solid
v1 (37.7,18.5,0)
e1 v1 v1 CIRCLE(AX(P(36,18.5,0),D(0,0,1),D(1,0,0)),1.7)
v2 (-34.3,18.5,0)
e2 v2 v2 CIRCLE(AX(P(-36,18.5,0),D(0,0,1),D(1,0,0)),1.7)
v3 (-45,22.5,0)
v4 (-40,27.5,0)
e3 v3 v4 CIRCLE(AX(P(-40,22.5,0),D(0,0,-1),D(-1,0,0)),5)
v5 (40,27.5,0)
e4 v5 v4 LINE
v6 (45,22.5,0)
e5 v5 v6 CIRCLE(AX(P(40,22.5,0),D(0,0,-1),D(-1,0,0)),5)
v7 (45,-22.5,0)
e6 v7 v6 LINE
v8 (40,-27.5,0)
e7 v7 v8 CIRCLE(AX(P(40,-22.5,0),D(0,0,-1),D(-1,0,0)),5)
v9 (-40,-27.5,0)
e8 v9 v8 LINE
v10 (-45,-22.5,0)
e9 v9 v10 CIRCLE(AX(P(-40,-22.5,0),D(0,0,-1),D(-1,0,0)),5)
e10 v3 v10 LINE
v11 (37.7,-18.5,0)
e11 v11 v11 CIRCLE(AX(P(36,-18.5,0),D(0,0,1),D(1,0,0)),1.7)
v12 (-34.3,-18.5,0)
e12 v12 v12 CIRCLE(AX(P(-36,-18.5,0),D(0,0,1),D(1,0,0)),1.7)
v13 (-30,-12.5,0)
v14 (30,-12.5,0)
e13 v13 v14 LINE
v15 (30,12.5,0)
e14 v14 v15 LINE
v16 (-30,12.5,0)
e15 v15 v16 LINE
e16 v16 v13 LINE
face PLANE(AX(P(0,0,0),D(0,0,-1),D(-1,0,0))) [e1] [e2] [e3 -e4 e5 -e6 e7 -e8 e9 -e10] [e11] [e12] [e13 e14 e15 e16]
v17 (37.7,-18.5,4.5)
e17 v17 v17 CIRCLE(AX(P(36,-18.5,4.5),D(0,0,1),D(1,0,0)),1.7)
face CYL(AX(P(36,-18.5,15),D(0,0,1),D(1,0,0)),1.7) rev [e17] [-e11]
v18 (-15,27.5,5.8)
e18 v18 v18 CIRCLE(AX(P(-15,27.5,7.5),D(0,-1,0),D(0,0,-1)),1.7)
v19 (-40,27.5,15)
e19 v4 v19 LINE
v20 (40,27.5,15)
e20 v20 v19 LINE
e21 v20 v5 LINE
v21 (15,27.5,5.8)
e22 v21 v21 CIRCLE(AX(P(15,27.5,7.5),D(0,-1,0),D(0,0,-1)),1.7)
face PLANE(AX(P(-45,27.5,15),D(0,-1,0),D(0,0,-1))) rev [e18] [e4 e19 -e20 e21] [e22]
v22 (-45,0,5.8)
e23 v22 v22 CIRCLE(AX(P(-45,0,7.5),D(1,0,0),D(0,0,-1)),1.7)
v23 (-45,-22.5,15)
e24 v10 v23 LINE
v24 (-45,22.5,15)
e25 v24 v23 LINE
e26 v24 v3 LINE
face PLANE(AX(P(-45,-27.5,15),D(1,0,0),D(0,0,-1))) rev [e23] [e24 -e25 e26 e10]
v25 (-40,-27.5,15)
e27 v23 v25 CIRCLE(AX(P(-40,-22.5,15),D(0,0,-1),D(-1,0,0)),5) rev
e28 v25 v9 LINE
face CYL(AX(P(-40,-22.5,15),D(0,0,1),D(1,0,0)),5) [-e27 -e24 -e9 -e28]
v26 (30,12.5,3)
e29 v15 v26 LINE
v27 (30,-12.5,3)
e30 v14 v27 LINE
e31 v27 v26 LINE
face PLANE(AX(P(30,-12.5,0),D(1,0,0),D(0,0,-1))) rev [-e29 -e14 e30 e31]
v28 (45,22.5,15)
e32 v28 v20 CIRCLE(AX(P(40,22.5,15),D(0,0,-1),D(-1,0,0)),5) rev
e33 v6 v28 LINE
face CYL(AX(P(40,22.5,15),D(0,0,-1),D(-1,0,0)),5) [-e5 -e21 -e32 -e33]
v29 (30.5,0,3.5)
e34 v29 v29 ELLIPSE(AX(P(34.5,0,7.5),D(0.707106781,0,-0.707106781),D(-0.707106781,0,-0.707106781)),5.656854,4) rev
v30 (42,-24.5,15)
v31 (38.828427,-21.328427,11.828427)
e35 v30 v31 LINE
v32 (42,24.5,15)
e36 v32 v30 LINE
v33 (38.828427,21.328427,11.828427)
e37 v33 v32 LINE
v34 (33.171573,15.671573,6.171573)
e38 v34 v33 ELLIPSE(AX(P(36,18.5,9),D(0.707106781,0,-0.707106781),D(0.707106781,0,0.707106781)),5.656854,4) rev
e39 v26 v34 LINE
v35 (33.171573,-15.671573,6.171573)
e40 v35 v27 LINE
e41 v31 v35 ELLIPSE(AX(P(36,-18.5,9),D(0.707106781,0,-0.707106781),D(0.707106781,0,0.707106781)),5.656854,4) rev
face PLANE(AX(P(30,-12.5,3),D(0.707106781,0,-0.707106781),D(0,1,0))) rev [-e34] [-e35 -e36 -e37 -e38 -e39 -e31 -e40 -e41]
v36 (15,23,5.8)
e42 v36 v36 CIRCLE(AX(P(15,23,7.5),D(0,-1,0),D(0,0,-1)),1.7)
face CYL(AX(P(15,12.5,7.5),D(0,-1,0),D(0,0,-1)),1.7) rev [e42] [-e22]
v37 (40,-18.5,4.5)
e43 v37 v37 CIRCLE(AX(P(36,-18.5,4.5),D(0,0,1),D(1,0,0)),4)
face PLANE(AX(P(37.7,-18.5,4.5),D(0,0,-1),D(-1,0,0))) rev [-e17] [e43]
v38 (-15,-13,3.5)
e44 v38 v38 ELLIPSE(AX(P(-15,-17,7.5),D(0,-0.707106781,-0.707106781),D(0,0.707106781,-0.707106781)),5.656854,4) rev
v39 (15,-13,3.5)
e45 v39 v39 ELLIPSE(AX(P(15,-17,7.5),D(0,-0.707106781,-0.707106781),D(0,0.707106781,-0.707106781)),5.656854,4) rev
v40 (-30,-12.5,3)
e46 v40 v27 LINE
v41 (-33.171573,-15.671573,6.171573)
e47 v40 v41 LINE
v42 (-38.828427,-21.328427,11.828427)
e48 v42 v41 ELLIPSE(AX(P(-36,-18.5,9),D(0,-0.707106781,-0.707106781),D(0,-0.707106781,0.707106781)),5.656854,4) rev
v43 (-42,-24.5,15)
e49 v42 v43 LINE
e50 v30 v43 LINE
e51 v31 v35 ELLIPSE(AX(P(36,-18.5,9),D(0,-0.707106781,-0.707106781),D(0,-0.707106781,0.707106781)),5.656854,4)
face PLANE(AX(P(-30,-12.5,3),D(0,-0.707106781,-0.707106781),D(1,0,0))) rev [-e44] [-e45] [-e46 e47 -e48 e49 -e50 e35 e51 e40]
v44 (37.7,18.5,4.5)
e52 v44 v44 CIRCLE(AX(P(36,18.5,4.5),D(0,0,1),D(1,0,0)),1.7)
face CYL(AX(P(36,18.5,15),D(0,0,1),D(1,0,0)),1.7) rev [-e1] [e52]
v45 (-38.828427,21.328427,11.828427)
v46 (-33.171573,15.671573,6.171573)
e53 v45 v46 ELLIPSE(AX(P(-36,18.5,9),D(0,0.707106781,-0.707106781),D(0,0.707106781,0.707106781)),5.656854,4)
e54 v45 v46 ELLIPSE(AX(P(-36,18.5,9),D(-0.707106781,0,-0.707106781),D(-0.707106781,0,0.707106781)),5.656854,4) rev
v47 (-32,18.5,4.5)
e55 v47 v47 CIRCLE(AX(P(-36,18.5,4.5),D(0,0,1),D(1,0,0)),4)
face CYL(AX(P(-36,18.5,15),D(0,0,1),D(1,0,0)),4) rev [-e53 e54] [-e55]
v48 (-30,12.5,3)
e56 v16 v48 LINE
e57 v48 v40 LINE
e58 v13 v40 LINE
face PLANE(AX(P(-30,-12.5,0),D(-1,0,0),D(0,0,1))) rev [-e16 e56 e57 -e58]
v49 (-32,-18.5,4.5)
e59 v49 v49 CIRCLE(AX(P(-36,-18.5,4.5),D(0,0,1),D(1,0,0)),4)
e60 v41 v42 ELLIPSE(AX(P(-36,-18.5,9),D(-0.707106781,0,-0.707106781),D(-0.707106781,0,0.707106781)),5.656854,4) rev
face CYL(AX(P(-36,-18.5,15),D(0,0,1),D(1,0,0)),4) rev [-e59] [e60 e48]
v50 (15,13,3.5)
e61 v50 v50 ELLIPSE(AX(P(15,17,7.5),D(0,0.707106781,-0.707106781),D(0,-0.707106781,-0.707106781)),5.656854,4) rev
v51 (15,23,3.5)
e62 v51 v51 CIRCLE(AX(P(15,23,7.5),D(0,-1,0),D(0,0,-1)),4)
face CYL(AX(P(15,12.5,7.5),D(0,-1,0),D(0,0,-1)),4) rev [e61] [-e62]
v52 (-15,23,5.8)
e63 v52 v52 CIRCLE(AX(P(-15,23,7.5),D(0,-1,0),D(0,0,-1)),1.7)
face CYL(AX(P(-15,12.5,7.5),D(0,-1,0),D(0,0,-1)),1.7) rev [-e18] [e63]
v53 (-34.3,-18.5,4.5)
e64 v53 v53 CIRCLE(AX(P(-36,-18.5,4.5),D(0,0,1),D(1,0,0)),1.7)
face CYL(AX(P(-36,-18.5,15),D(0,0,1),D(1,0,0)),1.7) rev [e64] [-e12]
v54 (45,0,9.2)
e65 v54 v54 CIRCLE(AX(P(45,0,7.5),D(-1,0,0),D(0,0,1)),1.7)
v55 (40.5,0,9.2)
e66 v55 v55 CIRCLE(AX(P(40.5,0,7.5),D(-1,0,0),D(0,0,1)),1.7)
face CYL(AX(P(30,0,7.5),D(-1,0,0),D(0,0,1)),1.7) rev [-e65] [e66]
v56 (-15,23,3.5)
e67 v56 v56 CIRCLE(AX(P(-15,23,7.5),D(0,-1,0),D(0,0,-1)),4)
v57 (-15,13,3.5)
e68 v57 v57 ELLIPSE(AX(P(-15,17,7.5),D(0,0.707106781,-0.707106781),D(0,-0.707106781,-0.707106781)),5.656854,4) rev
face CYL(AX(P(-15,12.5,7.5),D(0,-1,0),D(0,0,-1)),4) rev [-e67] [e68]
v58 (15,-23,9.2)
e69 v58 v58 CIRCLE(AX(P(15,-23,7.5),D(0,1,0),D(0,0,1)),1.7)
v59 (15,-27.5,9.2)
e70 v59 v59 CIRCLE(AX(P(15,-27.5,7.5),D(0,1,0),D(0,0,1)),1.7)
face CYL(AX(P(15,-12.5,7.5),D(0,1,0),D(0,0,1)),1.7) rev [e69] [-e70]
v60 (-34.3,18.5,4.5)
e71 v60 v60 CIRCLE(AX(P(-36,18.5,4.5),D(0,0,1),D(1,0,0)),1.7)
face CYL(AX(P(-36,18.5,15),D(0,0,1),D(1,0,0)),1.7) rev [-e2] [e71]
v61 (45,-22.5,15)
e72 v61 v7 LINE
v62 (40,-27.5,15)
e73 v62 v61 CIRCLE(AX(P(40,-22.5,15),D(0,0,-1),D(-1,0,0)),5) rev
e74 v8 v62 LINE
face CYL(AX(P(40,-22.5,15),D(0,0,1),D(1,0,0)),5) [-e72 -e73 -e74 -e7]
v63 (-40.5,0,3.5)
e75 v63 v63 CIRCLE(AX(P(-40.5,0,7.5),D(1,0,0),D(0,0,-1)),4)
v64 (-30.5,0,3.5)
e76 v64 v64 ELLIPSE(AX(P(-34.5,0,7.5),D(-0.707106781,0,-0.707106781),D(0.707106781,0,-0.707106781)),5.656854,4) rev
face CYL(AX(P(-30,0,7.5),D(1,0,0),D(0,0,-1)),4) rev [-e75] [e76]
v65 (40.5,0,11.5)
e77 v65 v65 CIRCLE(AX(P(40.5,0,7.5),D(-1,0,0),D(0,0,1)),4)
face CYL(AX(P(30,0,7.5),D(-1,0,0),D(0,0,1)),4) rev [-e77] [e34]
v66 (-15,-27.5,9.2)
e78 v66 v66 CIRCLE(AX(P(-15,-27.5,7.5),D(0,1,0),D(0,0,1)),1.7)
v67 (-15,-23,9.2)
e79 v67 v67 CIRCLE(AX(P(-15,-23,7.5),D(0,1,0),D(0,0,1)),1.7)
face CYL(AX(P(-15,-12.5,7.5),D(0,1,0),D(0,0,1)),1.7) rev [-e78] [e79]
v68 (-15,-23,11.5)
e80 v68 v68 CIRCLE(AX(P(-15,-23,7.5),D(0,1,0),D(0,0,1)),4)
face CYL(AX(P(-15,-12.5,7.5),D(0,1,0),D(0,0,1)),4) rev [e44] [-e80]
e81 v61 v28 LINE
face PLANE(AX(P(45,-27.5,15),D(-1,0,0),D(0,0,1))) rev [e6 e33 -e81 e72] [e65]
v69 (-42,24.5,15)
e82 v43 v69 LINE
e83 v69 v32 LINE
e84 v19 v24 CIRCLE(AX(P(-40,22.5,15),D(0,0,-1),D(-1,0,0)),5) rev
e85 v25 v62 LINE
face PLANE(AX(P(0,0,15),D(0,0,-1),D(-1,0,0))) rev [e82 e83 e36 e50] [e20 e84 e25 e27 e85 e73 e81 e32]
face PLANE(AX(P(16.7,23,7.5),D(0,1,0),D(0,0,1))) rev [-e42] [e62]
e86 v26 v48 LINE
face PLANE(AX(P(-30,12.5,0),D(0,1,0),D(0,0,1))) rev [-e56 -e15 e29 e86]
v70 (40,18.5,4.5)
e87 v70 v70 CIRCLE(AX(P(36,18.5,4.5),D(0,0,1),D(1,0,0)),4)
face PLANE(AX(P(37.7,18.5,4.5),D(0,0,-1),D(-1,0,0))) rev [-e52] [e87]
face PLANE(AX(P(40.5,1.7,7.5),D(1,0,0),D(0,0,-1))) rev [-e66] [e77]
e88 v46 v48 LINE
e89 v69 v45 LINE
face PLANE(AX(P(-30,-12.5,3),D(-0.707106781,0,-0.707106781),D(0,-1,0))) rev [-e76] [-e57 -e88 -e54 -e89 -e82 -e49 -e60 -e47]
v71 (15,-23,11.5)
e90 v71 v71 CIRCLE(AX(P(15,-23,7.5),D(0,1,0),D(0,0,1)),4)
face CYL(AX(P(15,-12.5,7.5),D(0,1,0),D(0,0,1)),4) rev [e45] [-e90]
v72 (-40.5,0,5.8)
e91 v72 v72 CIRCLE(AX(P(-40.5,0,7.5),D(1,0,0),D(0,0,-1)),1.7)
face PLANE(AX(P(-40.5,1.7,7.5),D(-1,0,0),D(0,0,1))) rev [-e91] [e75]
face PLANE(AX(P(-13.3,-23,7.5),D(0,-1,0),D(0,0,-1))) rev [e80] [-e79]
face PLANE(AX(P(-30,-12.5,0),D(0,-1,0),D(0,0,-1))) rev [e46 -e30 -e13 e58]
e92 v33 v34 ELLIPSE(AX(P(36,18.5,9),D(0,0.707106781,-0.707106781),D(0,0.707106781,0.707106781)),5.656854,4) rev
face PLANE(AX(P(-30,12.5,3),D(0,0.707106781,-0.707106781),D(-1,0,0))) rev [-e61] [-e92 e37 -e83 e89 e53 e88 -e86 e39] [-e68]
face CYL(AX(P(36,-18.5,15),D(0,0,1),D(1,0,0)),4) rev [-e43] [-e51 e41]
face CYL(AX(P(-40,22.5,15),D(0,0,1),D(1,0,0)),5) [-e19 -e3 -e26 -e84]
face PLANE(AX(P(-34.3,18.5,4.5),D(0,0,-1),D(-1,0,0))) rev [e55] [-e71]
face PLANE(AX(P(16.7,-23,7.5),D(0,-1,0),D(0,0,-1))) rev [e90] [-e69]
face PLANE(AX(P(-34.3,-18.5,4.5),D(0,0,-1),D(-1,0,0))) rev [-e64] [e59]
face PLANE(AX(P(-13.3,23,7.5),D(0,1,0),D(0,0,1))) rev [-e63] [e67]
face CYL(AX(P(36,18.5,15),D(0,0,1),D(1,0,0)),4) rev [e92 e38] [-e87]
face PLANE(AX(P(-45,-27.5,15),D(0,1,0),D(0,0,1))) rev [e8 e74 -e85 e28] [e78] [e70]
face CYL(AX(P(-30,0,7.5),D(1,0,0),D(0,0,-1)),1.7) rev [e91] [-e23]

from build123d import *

# Parameters (mm, degrees)
SKETCH1_W                       = 90
SKETCH1_H                       = 55
BOSS_EXTRUDE1_DEPTH             = 15
SKETCH2_W                       = 60
SKETCH2_H                       = 25
CUT_EXTRUDE1_DEPTH              = 55.829280499
CBORE_FOR_M3_SBHCS1_D           = 3.4
CBORE_FOR_M3_SBHCS1_CBORE_D     = 8
CBORE_FOR_M3_SBHCS1_CBORE_DEPTH = 10.5
FILLET7_R                       = 5
FILLET8_R                       = 5
FILLET9_R                       = 5
FILLET10_R                      = 5
CBORE_FOR_M3_SBHCS2_D           = 3.4
CBORE_FOR_M3_SBHCS2_DEPTH       = 15
CBORE_FOR_M3_SBHCS2_CBORE_D     = 8
CBORE_FOR_M3_SBHCS2_CBORE_DEPTH = 10.5
CBORE_FOR_M3_SBHCS6_D           = 3.4
CBORE_FOR_M3_SBHCS6_DEPTH       = 15
CBORE_FOR_M3_SBHCS6_CBORE_D     = 8
CBORE_FOR_M3_SBHCS6_CBORE_DEPTH = 10.5
CBORE_FOR_M3_SBHCS7_D           = 3.4
CBORE_FOR_M3_SBHCS7_DEPTH       = 15
CBORE_FOR_M3_SBHCS7_CBORE_D     = 8
CBORE_FOR_M3_SBHCS7_CBORE_DEPTH = 10.5
CBORE_FOR_M3_SBHCS8_D           = 3.4
CBORE_FOR_M3_SBHCS8_DEPTH       = 15
CBORE_FOR_M3_SBHCS8_CBORE_D     = 8
CBORE_FOR_M3_SBHCS8_CBORE_DEPTH = 10.5
CHAMFER5_SIZE                   = 12
CHAMFER7_SIZE                   = 12
CHAMFER8_SIZE                   = 12
CHAMFER9_SIZE                   = 12


with BuildPart() as part:
    # Sketch1 → Boss-Extrude1 (new body)
    with BuildSketch(Plane.XY):
        Rectangle(SKETCH1_W, SKETCH1_H)
    extrude(amount=BOSS_EXTRUDE1_DEPTH)

    # Sketch2 → Cut-Extrude1 (cut, through all)
    with BuildSketch(Plane.XY.offset(15)):
        Rectangle(SKETCH2_W, SKETCH2_H)
    extrude(amount=-CUT_EXTRUDE1_DEPTH, mode=Mode.SUBTRACT)

    # CBORE for M3 SBHCS1 (through all)
    with Locations(Plane.XY.offset(15)):
        with Locations((-36, -18.5), (-36, 18.5), (36, 18.5), (36, -18.5)):
            CounterBoreHole(CBORE_FOR_M3_SBHCS1_D / 2, CBORE_FOR_M3_SBHCS1_CBORE_D / 2, CBORE_FOR_M3_SBHCS1_CBORE_DEPTH)

    # Fillet7
    fillet7_edges = [part.edges().sort_by_distance(p)[0] for p in [
        (-45, -27.5, 7.5),
    ]]
    fillet(fillet7_edges, radius=FILLET7_R)

    # Fillet8
    fillet8_edges = [part.edges().sort_by_distance(p)[0] for p in [
        (-45, 27.5, 7.5),
    ]]
    fillet(fillet8_edges, radius=FILLET8_R)

    # Fillet9
    fillet9_edges = [part.edges().sort_by_distance(p)[0] for p in [
        (45, 27.5, 7.5),
    ]]
    fillet(fillet9_edges, radius=FILLET9_R)

    # Fillet10
    fillet10_edges = [part.edges().sort_by_distance(p)[0] for p in [
        (45, -27.5, 7.5),
    ]]
    fillet(fillet10_edges, radius=FILLET10_R)

    # CBORE for M3 SBHCS2
    with Locations(Plane(origin=(-30, 0, 0), x_dir=(0, 0, -1), z_dir=(1, 0, 0))):
        with Locations((-7.5, 0)):
            CounterBoreHole(CBORE_FOR_M3_SBHCS2_D / 2, CBORE_FOR_M3_SBHCS2_CBORE_D / 2, CBORE_FOR_M3_SBHCS2_CBORE_DEPTH, depth=CBORE_FOR_M3_SBHCS2_DEPTH)

    # CBORE for M3 SBHCS6
    with Locations(Plane(origin=(0, -12.5, 0), x_dir=(1, 0, 0), z_dir=(0, 1, 0))):
        with Locations((-15, -7.5), (15, -7.5)):
            CounterBoreHole(CBORE_FOR_M3_SBHCS6_D / 2, CBORE_FOR_M3_SBHCS6_CBORE_D / 2, CBORE_FOR_M3_SBHCS6_CBORE_DEPTH, depth=CBORE_FOR_M3_SBHCS6_DEPTH)

    # CBORE for M3 SBHCS7
    with Locations(Plane(origin=(0, 12.5, 0), x_dir=(-1, 0, 0), z_dir=(0, -1, 0))):
        with Locations((15, -7.5), (-15, -7.5)):
            CounterBoreHole(CBORE_FOR_M3_SBHCS7_D / 2, CBORE_FOR_M3_SBHCS7_CBORE_D / 2, CBORE_FOR_M3_SBHCS7_CBORE_DEPTH, depth=CBORE_FOR_M3_SBHCS7_DEPTH)

    # CBORE for M3 SBHCS8
    with Locations(Plane.ZY.offset(-30)):
        with Locations((7.5, 0)):
            CounterBoreHole(CBORE_FOR_M3_SBHCS8_D / 2, CBORE_FOR_M3_SBHCS8_CBORE_D / 2, CBORE_FOR_M3_SBHCS8_CBORE_DEPTH, depth=CBORE_FOR_M3_SBHCS8_DEPTH)

    # Chamfer5
    # the kernel refuses this chamfer: 12 mm, written as the material it takes off along each edge
    with BuildSketch(Plane(origin=(30, 12.5, 15), x_dir=(0, -0.027495876610586348, -0.9996219169112968), z_dir=(-1, 0, 0))) as chamfer5_piece_1:
        Polygon((CHAMFER5_SIZE * 0.999621916911, -CHAMFER5_SIZE * 0.0274958766106), (-CHAMFER5_SIZE * 0.0274958766106, -CHAMFER5_SIZE * 0.999621916911), (0, 0), align=None)
    extrude(amount=60, mode=Mode.SUBTRACT)

    # Chamfer7
    # the kernel refuses this chamfer: 12 mm, written as the material it takes off along each edge
    with BuildSketch(Plane(origin=(-30, -12.5, 15), x_dir=(0, -0.9996219169112969, 0.027495876610586348), z_dir=(1, 0, 0))) as chamfer7_piece_1:
        Polygon((CHAMFER7_SIZE * 0.999621916911, CHAMFER7_SIZE * 0.0274958766106), (-CHAMFER7_SIZE * 0.0274958766106, CHAMFER7_SIZE * 0.999621916911), (0, 0), align=None)
    extrude(amount=60, mode=Mode.SUBTRACT)

    # Chamfer8
    # the kernel refuses this chamfer: 12 mm, written as the material it takes off along each edge
    with BuildSketch(Plane(origin=(30, -55.360195856, 15), x_dir=(0.9996219169112969, 5.384635157726403e-15, 0.027495876610586355), z_dir=(0, 1, 0))) as chamfer8_piece_1_section:
        Polygon((CHAMFER8_SIZE * 0.999621916911, CHAMFER8_SIZE * 0.0274958766106), (-CHAMFER8_SIZE * 0.0274958766106, CHAMFER8_SIZE * 0.999621916911), (0, 0), align=None)
    chamfer8_piece_1 = extrude(amount=110.720391711, mode=Mode.PRIVATE)
    chamfer8_piece_1 = split(chamfer8_piece_1, bisect_by=Plane(origin=(33.163106807, 2.674956812, -6.825043188), z_dir=(0, -0.7071067811862648, 0.7071067811868302)), keep=Keep.TOP, mode=Mode.PRIVATE)
    chamfer8_piece_1 = split(chamfer8_piece_1, bisect_by=Plane(origin=(33.163106807, -18.33806362, 8.83806362), z_dir=(0, 0.7071067811868302, 0.7071067811862648)), keep=Keep.TOP, mode=Mode.PRIVATE)
    add(chamfer8_piece_1, mode=Mode.SUBTRACT)

    # Chamfer9
    # the kernel refuses this chamfer: 12 mm, written as the material it takes off along each edge
    with BuildSketch(Plane(origin=(-30, 55.360195856, 15), x_dir=(-0.9996219169112969, 5.384635157726403e-15, 0.027495876610586355), z_dir=(0, -1, 0))) as chamfer9_piece_1_section:
        Polygon((CHAMFER9_SIZE * 0.999621916911, CHAMFER9_SIZE * 0.0274958766106), (-CHAMFER9_SIZE * 0.0274958766106, CHAMFER9_SIZE * 0.999621916911), (0, 0), align=None)
    chamfer9_piece_1 = extrude(amount=110.720391711, mode=Mode.PRIVATE)
    chamfer9_piece_1 = split(chamfer9_piece_1, bisect_by=Plane(origin=(-33.163106802, 18.338063618, 8.838063618), z_dir=(0, -0.7071067811862648, 0.7071067811868302)), keep=Keep.TOP, mode=Mode.PRIVATE)
    chamfer9_piece_1 = split(chamfer9_piece_1, bisect_by=Plane(origin=(-33.163106802, -2.674956815, -6.825043185), z_dir=(0, 0.7071067811868302, 0.7071067811862648)), keep=Keep.TOP, mode=Mode.PRIVATE)
    add(chamfer9_piece_1, mode=Mode.SUBTRACT)


solid = part.part
